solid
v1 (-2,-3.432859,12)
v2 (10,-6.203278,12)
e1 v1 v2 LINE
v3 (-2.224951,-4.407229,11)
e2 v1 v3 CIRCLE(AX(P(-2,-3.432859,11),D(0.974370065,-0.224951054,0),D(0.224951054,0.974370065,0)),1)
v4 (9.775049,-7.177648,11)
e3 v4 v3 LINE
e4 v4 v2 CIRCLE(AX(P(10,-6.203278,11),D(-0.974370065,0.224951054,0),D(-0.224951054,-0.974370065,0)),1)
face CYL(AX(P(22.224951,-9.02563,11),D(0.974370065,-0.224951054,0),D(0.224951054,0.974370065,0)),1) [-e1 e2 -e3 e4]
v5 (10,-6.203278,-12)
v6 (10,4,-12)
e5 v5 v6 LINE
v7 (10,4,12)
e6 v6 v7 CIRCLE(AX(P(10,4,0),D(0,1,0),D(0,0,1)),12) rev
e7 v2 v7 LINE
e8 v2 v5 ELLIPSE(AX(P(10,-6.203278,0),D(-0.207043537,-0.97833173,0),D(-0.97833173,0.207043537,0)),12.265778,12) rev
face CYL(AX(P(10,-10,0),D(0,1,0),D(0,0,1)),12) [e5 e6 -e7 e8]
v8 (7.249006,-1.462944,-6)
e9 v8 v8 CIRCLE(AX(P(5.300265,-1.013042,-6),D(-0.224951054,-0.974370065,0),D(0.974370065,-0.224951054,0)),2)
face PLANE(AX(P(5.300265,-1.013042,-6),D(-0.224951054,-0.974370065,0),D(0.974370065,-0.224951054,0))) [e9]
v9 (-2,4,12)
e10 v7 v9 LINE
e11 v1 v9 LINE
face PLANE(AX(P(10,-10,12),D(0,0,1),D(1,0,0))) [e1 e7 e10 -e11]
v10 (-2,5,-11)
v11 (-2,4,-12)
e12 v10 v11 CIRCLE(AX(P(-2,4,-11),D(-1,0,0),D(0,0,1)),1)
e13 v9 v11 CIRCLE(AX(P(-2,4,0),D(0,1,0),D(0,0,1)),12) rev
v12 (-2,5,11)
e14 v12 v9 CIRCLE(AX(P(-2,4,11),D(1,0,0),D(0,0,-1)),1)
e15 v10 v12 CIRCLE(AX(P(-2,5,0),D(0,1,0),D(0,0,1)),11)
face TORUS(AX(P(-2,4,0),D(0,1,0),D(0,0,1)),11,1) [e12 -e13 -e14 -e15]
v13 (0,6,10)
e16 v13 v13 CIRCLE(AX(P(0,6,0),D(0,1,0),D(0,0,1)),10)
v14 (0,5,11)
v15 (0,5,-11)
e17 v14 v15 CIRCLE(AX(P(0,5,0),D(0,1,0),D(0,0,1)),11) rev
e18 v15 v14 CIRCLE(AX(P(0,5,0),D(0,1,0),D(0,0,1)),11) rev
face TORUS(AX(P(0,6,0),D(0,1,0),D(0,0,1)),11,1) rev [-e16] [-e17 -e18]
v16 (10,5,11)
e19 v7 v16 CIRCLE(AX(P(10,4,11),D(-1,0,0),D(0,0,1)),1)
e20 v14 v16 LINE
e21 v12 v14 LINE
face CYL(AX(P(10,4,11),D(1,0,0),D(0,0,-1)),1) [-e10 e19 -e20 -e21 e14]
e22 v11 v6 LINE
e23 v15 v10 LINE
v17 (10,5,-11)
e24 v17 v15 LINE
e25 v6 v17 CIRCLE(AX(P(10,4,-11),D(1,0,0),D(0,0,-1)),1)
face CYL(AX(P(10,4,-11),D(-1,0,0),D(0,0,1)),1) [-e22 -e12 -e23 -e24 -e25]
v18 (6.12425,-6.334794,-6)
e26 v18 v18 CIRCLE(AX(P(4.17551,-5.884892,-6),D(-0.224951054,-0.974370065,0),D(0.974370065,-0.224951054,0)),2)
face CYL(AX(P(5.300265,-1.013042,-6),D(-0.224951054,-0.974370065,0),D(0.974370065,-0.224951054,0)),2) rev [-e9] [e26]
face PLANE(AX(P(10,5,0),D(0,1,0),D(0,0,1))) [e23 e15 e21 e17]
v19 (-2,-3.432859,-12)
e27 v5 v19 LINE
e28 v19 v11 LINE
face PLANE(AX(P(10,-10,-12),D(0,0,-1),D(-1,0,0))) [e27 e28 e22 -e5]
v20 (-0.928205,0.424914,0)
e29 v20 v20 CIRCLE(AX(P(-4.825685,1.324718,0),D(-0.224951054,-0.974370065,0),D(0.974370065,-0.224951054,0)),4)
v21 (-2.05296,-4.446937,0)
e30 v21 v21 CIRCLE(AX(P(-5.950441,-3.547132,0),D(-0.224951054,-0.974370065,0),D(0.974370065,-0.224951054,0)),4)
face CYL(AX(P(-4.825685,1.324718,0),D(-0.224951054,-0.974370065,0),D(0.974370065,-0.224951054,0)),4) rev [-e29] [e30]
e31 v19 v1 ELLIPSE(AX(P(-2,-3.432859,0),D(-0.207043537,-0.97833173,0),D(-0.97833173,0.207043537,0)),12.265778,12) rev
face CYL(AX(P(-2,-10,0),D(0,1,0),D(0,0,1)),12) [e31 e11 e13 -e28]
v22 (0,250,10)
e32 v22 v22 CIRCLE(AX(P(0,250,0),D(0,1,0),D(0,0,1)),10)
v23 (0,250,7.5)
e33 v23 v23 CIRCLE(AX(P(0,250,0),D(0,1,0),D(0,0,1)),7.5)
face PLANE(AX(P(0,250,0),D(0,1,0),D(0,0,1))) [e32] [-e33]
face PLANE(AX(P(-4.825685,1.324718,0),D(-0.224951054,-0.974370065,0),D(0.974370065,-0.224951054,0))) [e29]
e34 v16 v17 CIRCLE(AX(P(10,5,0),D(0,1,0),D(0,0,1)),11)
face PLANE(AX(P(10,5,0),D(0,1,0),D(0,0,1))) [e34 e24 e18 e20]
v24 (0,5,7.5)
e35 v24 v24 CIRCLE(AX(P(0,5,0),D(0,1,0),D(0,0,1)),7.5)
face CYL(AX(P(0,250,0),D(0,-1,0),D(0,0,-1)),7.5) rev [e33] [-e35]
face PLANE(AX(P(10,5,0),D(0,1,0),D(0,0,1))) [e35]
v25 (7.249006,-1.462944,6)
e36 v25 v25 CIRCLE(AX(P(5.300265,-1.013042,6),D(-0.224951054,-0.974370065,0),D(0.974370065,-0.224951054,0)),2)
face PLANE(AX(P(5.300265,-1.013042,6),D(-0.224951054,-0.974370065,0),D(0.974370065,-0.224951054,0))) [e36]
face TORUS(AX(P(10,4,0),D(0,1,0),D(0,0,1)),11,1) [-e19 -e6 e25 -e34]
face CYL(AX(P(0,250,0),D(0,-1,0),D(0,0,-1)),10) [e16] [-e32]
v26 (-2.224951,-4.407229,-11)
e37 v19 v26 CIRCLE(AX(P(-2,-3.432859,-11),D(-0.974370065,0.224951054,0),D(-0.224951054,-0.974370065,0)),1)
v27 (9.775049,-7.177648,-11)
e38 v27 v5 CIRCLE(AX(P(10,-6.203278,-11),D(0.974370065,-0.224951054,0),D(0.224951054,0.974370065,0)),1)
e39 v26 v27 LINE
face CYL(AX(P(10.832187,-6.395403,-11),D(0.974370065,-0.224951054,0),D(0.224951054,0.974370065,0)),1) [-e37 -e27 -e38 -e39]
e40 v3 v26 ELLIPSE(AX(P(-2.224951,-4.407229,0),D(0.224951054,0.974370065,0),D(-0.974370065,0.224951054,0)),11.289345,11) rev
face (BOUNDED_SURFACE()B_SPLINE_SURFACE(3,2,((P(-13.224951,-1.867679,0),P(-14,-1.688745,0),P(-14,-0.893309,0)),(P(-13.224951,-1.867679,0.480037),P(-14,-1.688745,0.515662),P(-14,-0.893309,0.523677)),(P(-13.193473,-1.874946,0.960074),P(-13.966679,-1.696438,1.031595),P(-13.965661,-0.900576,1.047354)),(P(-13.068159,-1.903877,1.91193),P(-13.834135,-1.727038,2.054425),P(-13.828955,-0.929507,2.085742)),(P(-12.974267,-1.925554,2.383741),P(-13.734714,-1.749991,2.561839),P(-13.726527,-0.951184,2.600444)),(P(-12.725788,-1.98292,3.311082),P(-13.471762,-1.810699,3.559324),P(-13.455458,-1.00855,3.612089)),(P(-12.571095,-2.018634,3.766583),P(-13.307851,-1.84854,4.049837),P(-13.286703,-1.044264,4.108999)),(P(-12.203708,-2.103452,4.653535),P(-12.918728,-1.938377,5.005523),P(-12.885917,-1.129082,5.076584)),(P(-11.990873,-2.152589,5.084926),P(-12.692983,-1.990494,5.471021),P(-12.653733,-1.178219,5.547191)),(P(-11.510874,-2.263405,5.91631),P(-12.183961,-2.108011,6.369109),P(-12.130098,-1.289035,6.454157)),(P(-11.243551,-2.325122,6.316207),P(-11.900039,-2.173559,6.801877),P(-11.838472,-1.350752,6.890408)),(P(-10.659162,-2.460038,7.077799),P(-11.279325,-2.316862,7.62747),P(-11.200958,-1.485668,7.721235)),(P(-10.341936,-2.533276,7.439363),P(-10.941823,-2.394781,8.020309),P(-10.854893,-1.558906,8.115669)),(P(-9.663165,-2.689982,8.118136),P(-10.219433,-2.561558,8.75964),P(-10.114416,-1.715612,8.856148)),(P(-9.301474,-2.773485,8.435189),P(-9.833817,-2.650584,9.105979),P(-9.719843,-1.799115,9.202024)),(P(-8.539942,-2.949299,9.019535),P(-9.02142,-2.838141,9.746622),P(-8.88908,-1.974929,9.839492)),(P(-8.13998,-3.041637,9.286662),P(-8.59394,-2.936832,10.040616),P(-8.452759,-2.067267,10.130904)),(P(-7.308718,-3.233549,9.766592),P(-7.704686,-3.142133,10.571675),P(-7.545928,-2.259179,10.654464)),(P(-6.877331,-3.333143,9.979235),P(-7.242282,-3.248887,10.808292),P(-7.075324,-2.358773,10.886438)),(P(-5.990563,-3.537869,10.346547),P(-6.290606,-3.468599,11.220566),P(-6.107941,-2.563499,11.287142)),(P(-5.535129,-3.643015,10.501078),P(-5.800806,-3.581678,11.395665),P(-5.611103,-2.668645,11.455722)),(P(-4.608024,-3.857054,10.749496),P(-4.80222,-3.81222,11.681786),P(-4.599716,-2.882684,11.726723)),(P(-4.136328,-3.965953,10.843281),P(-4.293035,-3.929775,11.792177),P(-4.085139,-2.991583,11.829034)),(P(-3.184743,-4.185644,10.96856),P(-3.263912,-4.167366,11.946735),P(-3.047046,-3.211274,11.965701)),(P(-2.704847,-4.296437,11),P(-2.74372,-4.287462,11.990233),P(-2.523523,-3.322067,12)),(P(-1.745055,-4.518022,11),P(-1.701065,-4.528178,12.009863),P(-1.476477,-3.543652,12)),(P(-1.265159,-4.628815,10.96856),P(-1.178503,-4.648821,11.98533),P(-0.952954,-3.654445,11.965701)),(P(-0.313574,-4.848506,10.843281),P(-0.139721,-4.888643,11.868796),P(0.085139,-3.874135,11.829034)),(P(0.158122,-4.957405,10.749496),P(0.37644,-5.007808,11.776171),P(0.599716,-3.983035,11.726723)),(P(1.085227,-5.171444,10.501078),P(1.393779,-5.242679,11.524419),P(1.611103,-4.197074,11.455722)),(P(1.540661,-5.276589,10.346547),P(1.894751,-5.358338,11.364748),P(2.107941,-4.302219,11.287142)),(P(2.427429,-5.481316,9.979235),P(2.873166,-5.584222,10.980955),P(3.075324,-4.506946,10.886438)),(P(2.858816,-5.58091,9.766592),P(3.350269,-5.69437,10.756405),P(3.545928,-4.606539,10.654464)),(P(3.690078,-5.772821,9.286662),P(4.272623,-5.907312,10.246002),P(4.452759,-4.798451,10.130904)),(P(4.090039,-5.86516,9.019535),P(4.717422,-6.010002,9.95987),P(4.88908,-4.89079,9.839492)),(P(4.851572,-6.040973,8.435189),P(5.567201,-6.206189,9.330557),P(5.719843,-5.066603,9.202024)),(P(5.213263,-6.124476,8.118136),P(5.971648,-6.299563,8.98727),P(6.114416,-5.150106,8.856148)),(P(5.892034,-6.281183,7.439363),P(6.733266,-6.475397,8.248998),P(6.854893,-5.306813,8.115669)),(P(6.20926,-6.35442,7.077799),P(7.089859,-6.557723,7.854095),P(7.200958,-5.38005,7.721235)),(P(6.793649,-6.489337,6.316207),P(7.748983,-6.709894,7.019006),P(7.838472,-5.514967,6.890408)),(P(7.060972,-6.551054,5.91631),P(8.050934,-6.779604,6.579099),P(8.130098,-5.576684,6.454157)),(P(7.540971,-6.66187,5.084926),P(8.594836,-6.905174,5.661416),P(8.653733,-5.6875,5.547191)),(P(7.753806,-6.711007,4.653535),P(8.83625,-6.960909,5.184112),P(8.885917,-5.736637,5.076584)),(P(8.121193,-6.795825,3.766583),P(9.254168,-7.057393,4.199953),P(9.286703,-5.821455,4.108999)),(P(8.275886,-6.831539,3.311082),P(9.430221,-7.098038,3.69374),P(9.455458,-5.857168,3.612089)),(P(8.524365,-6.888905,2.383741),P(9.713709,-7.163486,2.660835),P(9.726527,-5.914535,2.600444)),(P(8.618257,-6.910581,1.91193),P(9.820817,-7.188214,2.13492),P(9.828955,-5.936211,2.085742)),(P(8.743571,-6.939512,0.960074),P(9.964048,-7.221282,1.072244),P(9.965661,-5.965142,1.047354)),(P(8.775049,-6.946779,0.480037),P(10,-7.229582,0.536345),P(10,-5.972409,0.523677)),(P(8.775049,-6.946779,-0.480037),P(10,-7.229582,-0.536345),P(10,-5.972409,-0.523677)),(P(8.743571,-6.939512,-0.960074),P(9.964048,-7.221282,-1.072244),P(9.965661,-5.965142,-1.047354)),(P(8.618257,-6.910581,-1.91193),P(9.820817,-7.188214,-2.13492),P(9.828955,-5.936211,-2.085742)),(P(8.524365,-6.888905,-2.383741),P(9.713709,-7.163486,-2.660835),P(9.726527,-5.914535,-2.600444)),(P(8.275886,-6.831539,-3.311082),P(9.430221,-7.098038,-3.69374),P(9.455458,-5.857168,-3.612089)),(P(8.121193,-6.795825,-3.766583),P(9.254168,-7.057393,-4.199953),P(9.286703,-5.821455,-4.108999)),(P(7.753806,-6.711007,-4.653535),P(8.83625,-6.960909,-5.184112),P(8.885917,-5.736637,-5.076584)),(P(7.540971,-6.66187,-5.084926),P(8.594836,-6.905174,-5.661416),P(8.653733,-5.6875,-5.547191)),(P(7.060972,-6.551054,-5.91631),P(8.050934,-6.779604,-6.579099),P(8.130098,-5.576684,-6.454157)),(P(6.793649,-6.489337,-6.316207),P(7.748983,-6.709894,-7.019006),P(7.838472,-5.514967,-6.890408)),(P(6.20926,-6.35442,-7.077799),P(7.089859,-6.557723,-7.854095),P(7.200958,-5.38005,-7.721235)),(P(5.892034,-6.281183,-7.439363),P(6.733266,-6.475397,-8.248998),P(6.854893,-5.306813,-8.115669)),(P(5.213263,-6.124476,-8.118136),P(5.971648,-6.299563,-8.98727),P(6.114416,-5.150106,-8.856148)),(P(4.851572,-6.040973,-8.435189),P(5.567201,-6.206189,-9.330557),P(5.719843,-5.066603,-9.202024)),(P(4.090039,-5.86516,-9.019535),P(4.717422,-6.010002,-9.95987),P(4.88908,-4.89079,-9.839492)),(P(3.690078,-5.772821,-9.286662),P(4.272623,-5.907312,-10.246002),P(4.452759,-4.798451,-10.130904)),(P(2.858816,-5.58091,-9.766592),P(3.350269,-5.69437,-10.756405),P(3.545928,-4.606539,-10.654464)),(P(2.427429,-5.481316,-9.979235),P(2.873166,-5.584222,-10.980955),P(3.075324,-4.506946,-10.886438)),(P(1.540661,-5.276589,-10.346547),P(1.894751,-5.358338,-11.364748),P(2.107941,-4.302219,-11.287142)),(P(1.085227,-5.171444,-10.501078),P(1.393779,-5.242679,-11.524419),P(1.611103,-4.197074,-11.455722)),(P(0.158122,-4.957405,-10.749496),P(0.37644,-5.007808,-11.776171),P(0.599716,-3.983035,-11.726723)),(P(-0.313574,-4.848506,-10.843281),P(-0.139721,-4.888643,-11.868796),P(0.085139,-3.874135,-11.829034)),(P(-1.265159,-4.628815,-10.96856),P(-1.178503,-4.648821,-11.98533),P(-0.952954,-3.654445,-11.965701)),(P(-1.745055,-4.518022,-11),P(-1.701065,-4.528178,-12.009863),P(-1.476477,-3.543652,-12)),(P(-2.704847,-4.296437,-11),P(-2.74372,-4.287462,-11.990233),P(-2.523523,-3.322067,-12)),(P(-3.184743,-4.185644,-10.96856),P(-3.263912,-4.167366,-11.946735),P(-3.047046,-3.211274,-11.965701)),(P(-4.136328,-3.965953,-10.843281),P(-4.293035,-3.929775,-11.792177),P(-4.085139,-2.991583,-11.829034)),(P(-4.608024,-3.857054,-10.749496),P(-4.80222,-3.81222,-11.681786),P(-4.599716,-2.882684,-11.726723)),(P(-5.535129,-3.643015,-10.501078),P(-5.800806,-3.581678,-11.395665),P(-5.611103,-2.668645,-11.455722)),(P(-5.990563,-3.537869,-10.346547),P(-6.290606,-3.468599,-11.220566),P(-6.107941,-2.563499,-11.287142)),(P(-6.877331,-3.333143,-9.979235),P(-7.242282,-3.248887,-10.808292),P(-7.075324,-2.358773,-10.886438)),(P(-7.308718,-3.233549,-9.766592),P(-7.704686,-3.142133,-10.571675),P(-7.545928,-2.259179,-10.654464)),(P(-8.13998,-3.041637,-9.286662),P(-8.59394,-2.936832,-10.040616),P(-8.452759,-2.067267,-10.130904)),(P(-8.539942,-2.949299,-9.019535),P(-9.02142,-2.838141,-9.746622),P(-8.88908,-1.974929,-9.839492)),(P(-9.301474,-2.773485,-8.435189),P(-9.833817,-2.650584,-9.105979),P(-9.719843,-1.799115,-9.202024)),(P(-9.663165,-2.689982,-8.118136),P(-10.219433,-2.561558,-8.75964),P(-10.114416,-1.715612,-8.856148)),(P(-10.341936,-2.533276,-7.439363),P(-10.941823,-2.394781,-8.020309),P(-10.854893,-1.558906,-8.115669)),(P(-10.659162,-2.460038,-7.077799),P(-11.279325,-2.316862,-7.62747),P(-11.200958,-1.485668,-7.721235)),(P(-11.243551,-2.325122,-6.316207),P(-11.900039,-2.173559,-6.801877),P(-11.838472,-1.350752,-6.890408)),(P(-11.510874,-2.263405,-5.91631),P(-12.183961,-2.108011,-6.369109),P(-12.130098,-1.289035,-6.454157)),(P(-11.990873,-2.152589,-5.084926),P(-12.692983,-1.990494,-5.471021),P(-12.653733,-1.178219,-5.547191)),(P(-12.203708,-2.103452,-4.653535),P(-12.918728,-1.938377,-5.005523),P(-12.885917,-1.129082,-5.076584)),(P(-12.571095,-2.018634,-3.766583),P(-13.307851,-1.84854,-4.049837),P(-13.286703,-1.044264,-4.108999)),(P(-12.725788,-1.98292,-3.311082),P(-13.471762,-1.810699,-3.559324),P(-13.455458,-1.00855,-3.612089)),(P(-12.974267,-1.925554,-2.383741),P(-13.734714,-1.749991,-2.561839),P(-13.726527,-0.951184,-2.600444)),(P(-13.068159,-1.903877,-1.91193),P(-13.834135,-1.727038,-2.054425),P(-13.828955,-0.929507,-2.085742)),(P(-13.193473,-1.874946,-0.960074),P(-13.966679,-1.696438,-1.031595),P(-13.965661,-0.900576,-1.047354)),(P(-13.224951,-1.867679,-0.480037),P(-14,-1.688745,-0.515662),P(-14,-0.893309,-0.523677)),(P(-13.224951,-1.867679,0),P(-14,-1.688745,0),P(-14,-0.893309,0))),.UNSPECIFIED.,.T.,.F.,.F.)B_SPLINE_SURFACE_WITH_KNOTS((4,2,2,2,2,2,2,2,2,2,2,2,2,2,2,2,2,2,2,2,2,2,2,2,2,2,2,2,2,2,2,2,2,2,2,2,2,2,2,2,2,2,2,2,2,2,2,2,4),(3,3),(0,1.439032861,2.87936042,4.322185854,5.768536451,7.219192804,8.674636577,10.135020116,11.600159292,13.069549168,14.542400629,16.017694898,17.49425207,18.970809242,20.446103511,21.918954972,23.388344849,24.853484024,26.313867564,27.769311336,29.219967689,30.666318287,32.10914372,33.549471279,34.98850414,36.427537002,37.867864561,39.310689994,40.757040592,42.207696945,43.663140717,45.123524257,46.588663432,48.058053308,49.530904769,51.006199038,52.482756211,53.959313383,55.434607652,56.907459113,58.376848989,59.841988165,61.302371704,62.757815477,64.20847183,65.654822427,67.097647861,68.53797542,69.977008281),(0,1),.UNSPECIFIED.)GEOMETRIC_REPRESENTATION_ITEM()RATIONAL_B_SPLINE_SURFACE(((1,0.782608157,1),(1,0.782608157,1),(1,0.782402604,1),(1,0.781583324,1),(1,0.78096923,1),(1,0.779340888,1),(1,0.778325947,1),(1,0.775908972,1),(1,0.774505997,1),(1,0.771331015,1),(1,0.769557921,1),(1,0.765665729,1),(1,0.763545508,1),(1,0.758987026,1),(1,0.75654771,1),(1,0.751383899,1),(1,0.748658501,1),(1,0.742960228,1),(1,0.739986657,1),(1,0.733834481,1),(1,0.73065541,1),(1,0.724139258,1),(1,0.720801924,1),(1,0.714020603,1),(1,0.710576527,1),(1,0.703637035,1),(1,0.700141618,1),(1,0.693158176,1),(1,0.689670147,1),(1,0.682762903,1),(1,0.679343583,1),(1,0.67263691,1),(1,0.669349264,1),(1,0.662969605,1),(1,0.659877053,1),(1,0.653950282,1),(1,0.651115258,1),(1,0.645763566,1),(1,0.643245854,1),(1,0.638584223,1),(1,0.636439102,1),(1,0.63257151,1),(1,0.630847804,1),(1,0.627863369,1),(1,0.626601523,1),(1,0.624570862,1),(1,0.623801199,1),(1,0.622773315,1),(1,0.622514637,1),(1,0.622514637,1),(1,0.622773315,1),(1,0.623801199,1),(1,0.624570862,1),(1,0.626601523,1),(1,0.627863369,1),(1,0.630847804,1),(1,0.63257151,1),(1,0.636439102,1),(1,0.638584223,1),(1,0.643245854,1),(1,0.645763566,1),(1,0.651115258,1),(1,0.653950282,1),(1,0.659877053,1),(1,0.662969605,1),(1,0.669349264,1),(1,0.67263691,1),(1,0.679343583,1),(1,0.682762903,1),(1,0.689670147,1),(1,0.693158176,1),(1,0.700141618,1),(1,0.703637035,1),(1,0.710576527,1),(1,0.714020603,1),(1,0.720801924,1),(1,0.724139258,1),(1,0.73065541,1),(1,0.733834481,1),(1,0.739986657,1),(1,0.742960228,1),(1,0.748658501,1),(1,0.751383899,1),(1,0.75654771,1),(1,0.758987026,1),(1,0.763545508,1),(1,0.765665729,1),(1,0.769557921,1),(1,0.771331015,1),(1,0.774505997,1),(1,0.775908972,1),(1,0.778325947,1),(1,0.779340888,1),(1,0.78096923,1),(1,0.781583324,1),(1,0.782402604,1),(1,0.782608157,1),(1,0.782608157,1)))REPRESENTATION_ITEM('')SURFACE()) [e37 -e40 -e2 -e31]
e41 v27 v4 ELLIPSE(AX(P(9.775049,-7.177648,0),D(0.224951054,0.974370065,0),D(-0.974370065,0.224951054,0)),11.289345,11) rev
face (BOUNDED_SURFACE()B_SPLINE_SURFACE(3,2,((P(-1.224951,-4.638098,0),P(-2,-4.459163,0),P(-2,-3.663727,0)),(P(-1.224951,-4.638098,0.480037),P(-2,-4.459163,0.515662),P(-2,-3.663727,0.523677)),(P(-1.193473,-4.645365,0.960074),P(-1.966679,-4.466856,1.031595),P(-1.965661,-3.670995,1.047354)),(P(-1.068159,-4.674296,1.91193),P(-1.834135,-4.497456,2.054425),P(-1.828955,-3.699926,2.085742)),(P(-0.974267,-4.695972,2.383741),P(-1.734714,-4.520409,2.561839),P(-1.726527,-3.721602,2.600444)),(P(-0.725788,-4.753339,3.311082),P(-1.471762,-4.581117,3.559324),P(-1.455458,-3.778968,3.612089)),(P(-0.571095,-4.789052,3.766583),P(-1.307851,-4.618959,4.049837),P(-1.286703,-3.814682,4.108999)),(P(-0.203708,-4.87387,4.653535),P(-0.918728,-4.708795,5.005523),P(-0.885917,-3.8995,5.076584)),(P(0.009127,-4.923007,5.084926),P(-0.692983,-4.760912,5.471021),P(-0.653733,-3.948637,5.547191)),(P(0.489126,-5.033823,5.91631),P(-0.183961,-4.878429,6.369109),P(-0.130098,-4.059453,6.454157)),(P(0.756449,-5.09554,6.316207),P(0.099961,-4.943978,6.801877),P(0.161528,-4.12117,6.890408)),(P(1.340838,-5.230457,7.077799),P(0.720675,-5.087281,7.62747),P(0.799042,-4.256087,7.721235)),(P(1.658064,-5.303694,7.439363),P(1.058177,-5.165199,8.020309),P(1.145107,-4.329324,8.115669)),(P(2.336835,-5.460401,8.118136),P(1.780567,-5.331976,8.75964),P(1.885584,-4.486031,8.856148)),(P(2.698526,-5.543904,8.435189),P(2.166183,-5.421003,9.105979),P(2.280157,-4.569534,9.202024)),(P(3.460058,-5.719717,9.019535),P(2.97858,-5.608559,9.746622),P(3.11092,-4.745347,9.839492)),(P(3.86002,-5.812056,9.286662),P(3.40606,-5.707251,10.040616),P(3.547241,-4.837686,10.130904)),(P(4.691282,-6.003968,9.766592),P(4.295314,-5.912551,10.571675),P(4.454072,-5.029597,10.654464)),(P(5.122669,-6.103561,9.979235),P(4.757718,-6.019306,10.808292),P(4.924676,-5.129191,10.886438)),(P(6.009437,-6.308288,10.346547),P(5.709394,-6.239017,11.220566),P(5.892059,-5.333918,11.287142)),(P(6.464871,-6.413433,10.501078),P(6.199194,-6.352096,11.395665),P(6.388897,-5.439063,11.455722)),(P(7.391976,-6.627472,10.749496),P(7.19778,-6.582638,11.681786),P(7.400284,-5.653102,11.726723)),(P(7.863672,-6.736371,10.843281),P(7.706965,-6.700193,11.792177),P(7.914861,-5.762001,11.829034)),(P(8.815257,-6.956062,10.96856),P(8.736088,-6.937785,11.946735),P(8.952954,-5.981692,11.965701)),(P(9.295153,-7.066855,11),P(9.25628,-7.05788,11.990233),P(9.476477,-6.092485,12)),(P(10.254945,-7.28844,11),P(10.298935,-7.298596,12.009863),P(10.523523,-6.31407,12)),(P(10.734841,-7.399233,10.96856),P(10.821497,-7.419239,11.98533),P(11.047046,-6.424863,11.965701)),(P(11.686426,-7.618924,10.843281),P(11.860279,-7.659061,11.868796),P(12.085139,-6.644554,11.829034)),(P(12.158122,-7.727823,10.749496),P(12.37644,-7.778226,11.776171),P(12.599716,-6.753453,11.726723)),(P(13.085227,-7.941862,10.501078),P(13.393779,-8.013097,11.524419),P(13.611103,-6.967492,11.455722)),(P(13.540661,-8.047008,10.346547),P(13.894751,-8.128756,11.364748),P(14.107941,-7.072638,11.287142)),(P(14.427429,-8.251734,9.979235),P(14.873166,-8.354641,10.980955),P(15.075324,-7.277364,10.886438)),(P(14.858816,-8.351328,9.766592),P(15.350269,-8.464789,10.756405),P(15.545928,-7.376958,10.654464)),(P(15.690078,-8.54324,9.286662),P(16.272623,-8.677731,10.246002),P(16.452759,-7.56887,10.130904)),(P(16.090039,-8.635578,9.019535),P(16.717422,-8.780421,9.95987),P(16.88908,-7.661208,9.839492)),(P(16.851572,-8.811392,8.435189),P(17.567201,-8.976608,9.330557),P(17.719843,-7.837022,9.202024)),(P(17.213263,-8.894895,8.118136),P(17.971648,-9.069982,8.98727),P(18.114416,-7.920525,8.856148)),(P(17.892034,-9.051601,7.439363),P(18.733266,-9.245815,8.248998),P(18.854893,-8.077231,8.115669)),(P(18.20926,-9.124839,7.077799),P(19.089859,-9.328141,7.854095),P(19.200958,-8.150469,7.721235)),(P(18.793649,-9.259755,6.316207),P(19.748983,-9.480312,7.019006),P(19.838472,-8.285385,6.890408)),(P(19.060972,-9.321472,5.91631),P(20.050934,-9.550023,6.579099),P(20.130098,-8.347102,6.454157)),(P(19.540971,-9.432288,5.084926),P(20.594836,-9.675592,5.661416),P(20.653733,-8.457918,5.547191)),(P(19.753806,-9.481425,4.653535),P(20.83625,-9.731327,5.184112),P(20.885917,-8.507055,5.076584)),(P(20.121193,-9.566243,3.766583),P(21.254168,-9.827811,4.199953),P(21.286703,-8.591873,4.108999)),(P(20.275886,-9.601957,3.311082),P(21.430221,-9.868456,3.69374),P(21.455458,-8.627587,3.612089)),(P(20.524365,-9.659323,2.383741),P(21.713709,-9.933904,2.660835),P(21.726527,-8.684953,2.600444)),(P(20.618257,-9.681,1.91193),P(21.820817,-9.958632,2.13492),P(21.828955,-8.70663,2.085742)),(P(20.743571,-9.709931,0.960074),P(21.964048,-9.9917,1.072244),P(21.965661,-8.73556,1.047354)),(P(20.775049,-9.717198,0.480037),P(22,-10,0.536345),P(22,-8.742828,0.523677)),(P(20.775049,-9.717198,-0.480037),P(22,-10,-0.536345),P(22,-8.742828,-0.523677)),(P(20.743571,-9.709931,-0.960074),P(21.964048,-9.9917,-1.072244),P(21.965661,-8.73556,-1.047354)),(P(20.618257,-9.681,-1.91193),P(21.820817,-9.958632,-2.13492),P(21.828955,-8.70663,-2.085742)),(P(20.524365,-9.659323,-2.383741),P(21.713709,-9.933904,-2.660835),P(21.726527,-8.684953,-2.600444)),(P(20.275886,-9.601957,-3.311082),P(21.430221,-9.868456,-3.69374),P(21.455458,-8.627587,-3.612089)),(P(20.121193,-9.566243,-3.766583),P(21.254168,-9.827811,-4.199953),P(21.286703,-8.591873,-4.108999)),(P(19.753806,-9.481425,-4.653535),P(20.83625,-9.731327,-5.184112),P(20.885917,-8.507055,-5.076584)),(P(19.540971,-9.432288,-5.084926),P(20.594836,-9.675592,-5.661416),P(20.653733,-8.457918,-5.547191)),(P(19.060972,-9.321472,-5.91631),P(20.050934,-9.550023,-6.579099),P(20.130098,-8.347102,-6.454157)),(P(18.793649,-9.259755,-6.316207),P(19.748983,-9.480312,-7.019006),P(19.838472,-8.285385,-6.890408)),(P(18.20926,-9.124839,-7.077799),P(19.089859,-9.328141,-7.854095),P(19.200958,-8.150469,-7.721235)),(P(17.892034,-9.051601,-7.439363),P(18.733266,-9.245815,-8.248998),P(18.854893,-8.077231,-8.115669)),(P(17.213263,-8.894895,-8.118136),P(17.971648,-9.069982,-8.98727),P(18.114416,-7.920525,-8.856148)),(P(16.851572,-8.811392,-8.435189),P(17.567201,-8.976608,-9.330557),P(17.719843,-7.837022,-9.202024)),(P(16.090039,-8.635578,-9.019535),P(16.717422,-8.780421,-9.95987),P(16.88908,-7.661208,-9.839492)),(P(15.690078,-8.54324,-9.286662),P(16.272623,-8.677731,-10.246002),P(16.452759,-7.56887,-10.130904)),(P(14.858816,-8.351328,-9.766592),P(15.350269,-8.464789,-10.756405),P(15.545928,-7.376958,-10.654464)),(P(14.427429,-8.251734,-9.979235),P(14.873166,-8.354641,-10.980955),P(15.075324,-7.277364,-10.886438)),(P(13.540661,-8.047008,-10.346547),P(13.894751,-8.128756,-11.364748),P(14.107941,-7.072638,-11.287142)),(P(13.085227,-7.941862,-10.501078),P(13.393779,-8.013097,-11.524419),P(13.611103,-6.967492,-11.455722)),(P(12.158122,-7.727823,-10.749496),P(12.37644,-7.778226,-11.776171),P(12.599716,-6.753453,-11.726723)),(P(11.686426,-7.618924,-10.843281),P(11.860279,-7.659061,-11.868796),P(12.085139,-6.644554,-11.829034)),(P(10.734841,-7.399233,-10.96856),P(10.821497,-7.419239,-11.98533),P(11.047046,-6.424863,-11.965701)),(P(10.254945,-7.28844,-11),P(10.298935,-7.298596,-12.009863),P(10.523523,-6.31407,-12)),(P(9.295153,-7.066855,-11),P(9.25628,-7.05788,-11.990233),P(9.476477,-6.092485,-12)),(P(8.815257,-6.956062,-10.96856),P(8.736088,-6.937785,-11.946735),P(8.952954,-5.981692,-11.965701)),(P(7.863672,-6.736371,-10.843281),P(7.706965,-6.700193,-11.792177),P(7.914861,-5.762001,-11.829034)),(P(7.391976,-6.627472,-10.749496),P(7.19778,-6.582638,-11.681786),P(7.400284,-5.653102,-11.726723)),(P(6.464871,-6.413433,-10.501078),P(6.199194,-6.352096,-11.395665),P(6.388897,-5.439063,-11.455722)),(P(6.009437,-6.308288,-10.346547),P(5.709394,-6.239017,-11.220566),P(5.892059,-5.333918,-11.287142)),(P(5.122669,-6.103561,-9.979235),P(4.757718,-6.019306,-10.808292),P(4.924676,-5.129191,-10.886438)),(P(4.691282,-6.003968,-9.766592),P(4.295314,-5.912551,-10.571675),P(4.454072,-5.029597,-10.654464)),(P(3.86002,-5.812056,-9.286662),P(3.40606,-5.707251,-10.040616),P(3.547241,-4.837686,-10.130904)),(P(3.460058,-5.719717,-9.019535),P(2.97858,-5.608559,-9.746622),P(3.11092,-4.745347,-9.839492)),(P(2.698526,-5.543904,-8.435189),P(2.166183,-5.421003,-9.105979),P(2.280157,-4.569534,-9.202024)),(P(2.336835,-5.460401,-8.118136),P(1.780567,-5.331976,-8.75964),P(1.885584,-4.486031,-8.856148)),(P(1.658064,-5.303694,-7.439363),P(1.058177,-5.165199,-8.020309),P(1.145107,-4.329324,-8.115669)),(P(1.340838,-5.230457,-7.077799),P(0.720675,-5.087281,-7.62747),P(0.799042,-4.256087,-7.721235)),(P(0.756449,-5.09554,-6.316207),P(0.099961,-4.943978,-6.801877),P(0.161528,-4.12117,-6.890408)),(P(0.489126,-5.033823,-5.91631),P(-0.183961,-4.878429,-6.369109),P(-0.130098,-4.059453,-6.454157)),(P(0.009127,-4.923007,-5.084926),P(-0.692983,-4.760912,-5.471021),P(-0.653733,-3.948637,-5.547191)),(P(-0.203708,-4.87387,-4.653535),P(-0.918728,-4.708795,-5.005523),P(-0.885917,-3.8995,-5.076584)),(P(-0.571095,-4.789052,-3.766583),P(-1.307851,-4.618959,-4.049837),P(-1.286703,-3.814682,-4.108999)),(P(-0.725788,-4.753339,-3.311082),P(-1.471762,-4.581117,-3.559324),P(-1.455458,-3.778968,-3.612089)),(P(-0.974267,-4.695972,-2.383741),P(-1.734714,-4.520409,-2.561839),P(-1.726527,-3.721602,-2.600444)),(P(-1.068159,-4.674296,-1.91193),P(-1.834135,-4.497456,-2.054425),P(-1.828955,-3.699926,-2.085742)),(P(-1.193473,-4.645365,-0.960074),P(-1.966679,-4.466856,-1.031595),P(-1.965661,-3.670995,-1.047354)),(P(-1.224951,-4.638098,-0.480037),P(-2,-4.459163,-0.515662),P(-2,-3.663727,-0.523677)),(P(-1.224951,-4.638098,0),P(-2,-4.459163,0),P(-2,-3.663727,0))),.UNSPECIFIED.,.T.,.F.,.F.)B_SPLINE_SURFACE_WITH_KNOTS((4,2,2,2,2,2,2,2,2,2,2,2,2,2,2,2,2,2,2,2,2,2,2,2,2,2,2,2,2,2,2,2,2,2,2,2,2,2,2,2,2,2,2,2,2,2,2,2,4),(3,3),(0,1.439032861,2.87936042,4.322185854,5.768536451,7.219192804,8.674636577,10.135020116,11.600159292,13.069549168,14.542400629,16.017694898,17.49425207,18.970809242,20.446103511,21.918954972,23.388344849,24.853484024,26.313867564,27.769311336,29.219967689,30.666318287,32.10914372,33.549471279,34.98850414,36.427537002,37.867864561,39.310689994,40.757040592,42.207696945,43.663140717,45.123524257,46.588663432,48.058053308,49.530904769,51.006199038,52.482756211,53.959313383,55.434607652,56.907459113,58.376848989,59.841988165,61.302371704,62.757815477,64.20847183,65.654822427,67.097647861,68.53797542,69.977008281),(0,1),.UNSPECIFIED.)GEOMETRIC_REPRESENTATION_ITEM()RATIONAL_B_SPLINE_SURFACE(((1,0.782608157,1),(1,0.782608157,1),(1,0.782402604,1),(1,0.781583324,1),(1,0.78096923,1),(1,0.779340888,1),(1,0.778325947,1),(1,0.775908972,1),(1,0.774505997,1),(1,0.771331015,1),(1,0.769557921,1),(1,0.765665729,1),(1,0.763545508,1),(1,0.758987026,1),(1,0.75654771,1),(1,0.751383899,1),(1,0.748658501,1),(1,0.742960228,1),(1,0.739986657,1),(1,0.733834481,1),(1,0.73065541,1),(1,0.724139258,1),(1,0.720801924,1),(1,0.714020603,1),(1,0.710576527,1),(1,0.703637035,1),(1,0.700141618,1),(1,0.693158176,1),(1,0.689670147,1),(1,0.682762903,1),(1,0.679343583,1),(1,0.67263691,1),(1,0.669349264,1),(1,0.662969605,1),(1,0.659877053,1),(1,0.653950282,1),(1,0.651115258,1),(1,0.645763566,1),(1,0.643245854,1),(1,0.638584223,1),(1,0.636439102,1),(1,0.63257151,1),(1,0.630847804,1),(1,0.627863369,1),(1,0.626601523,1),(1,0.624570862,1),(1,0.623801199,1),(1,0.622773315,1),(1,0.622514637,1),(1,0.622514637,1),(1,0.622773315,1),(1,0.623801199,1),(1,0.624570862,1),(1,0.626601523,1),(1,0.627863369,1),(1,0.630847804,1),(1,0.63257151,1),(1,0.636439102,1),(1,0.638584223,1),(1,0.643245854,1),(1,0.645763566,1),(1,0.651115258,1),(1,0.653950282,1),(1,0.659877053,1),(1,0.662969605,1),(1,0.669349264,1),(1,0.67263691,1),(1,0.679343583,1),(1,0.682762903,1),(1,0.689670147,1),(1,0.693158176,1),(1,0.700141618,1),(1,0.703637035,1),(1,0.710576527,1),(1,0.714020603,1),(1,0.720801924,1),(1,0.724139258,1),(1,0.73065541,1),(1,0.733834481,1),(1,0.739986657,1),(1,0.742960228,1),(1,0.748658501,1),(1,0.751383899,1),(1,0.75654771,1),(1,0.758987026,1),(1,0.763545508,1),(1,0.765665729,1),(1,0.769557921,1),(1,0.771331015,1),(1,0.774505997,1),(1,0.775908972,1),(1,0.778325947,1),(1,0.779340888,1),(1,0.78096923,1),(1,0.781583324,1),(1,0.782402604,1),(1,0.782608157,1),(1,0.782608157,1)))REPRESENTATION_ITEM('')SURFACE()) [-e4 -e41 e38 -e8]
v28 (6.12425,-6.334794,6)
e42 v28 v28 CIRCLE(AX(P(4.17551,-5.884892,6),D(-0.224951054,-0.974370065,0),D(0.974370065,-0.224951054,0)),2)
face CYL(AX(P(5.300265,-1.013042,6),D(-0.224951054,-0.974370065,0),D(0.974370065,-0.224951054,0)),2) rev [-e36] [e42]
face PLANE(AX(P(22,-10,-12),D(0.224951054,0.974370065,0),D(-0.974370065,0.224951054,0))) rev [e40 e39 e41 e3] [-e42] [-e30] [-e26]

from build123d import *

# Parameters (mm, degrees)
SKETCH_1_R               = 10
SKETCH_1_R_2             = 7.5
EXTRUDE_1_DEPTH          = 250
EXTRUDE_2_DEPTH          = 5
EXTRUDE_2_DEPTH_BACK     = 10
CUT_EXTRUDE_1_DEPTH      = 252.25286068
CUT_EXTRUDE_1_DEPTH_BACK = 252.25286068
FILLET_1_R               = 1
SKETCH_5_R               = 4
SKETCH_5_R_2             = 2
CUT_EXTRUDE_2_DEPTH      = 5


with BuildPart() as part:
    # 草图1 → 凸台-拉伸1 (new body)
    with BuildSketch(Plane(origin=(0, 0, 0), x_dir=(1, 0, 0), z_dir=(0, 1, 0))):
        with Locations(Location((0, 0, 0), (0, 0, 270))):
            Circle(SKETCH_1_R)
        with Locations(Location((0, 0, 0), (0, 0, 270))):
            Circle(SKETCH_1_R_2, mode=Mode.SUBTRACT)
    extrude(amount=EXTRUDE_1_DEPTH)

    # 草图2 → 凸台-拉伸2 (add, two sides: drawn at the far end of the back side and taken through both)
    with BuildSketch(Plane(origin=(0, 0, 0), x_dir=(1, 0, 0), z_dir=(0, 1, 0)).offset(-EXTRUDE_2_DEPTH_BACK)):
        with BuildLine():
            Line((10, -12), (-2, -12))
            ThreePointArc((-2, -12), (-14, 0), (-2, 12))
            Line((-2, 12), (10, 12))
            ThreePointArc((10, 12), (22, 0), (10, -12))
        make_face()
    extrude(amount=EXTRUDE_2_DEPTH + EXTRUDE_2_DEPTH_BACK)

    # 草图4 → 切除-拉伸1 (cut, two sides: drawn at the far end of the back side and taken through both)
    with BuildSketch(Plane.XY.offset(-CUT_EXTRUDE_1_DEPTH_BACK)):
        Polygon((-14, -1.688745119), (-14, -10), (22, -10), align=None)
    extrude(amount=CUT_EXTRUDE_1_DEPTH + CUT_EXTRUDE_1_DEPTH_BACK, mode=Mode.SUBTRACT)

    # 圆角1
    fillet_1_edges = [part.edges().sort_by_distance(p)[0] for p in [
        (0, 5, -10),
        (22, 5, 0),
        (4, 5, -12),
        (-14, 5, 0),
        (4, 5, 12),
        (18.485281374, -9.188563269, -8.485281374),
        (-10.485281374, -2.500181851, 8.485281374),
        (4, -5.84437256, 12),
        (4, -5.84437256, -12),
    ]]
    fillet(fillet_1_edges, radius=FILLET_1_R - 0.0001)  # a hair under: the kernel refuses the full size

    # 草图5 → 切除-拉伸2 (cut)
    with BuildSketch(Plane(origin=(-1.078590243, -4.671887617, 0), x_dir=(0.9743700647852368, -0.22495105434385856, 0), z_dir=(-0.22495105434385856, -0.9743700647852368, 0))):
        with Locations((-5, 0)):
            Circle(SKETCH_5_R)
        with Locations((5.392304845, 6)):
            Circle(SKETCH_5_R_2)
        with Locations((5.392304845, -6)):
            Circle(SKETCH_5_R_2)
    extrude(amount=-CUT_EXTRUDE_2_DEPTH, mode=Mode.SUBTRACT)


solid = part.part
